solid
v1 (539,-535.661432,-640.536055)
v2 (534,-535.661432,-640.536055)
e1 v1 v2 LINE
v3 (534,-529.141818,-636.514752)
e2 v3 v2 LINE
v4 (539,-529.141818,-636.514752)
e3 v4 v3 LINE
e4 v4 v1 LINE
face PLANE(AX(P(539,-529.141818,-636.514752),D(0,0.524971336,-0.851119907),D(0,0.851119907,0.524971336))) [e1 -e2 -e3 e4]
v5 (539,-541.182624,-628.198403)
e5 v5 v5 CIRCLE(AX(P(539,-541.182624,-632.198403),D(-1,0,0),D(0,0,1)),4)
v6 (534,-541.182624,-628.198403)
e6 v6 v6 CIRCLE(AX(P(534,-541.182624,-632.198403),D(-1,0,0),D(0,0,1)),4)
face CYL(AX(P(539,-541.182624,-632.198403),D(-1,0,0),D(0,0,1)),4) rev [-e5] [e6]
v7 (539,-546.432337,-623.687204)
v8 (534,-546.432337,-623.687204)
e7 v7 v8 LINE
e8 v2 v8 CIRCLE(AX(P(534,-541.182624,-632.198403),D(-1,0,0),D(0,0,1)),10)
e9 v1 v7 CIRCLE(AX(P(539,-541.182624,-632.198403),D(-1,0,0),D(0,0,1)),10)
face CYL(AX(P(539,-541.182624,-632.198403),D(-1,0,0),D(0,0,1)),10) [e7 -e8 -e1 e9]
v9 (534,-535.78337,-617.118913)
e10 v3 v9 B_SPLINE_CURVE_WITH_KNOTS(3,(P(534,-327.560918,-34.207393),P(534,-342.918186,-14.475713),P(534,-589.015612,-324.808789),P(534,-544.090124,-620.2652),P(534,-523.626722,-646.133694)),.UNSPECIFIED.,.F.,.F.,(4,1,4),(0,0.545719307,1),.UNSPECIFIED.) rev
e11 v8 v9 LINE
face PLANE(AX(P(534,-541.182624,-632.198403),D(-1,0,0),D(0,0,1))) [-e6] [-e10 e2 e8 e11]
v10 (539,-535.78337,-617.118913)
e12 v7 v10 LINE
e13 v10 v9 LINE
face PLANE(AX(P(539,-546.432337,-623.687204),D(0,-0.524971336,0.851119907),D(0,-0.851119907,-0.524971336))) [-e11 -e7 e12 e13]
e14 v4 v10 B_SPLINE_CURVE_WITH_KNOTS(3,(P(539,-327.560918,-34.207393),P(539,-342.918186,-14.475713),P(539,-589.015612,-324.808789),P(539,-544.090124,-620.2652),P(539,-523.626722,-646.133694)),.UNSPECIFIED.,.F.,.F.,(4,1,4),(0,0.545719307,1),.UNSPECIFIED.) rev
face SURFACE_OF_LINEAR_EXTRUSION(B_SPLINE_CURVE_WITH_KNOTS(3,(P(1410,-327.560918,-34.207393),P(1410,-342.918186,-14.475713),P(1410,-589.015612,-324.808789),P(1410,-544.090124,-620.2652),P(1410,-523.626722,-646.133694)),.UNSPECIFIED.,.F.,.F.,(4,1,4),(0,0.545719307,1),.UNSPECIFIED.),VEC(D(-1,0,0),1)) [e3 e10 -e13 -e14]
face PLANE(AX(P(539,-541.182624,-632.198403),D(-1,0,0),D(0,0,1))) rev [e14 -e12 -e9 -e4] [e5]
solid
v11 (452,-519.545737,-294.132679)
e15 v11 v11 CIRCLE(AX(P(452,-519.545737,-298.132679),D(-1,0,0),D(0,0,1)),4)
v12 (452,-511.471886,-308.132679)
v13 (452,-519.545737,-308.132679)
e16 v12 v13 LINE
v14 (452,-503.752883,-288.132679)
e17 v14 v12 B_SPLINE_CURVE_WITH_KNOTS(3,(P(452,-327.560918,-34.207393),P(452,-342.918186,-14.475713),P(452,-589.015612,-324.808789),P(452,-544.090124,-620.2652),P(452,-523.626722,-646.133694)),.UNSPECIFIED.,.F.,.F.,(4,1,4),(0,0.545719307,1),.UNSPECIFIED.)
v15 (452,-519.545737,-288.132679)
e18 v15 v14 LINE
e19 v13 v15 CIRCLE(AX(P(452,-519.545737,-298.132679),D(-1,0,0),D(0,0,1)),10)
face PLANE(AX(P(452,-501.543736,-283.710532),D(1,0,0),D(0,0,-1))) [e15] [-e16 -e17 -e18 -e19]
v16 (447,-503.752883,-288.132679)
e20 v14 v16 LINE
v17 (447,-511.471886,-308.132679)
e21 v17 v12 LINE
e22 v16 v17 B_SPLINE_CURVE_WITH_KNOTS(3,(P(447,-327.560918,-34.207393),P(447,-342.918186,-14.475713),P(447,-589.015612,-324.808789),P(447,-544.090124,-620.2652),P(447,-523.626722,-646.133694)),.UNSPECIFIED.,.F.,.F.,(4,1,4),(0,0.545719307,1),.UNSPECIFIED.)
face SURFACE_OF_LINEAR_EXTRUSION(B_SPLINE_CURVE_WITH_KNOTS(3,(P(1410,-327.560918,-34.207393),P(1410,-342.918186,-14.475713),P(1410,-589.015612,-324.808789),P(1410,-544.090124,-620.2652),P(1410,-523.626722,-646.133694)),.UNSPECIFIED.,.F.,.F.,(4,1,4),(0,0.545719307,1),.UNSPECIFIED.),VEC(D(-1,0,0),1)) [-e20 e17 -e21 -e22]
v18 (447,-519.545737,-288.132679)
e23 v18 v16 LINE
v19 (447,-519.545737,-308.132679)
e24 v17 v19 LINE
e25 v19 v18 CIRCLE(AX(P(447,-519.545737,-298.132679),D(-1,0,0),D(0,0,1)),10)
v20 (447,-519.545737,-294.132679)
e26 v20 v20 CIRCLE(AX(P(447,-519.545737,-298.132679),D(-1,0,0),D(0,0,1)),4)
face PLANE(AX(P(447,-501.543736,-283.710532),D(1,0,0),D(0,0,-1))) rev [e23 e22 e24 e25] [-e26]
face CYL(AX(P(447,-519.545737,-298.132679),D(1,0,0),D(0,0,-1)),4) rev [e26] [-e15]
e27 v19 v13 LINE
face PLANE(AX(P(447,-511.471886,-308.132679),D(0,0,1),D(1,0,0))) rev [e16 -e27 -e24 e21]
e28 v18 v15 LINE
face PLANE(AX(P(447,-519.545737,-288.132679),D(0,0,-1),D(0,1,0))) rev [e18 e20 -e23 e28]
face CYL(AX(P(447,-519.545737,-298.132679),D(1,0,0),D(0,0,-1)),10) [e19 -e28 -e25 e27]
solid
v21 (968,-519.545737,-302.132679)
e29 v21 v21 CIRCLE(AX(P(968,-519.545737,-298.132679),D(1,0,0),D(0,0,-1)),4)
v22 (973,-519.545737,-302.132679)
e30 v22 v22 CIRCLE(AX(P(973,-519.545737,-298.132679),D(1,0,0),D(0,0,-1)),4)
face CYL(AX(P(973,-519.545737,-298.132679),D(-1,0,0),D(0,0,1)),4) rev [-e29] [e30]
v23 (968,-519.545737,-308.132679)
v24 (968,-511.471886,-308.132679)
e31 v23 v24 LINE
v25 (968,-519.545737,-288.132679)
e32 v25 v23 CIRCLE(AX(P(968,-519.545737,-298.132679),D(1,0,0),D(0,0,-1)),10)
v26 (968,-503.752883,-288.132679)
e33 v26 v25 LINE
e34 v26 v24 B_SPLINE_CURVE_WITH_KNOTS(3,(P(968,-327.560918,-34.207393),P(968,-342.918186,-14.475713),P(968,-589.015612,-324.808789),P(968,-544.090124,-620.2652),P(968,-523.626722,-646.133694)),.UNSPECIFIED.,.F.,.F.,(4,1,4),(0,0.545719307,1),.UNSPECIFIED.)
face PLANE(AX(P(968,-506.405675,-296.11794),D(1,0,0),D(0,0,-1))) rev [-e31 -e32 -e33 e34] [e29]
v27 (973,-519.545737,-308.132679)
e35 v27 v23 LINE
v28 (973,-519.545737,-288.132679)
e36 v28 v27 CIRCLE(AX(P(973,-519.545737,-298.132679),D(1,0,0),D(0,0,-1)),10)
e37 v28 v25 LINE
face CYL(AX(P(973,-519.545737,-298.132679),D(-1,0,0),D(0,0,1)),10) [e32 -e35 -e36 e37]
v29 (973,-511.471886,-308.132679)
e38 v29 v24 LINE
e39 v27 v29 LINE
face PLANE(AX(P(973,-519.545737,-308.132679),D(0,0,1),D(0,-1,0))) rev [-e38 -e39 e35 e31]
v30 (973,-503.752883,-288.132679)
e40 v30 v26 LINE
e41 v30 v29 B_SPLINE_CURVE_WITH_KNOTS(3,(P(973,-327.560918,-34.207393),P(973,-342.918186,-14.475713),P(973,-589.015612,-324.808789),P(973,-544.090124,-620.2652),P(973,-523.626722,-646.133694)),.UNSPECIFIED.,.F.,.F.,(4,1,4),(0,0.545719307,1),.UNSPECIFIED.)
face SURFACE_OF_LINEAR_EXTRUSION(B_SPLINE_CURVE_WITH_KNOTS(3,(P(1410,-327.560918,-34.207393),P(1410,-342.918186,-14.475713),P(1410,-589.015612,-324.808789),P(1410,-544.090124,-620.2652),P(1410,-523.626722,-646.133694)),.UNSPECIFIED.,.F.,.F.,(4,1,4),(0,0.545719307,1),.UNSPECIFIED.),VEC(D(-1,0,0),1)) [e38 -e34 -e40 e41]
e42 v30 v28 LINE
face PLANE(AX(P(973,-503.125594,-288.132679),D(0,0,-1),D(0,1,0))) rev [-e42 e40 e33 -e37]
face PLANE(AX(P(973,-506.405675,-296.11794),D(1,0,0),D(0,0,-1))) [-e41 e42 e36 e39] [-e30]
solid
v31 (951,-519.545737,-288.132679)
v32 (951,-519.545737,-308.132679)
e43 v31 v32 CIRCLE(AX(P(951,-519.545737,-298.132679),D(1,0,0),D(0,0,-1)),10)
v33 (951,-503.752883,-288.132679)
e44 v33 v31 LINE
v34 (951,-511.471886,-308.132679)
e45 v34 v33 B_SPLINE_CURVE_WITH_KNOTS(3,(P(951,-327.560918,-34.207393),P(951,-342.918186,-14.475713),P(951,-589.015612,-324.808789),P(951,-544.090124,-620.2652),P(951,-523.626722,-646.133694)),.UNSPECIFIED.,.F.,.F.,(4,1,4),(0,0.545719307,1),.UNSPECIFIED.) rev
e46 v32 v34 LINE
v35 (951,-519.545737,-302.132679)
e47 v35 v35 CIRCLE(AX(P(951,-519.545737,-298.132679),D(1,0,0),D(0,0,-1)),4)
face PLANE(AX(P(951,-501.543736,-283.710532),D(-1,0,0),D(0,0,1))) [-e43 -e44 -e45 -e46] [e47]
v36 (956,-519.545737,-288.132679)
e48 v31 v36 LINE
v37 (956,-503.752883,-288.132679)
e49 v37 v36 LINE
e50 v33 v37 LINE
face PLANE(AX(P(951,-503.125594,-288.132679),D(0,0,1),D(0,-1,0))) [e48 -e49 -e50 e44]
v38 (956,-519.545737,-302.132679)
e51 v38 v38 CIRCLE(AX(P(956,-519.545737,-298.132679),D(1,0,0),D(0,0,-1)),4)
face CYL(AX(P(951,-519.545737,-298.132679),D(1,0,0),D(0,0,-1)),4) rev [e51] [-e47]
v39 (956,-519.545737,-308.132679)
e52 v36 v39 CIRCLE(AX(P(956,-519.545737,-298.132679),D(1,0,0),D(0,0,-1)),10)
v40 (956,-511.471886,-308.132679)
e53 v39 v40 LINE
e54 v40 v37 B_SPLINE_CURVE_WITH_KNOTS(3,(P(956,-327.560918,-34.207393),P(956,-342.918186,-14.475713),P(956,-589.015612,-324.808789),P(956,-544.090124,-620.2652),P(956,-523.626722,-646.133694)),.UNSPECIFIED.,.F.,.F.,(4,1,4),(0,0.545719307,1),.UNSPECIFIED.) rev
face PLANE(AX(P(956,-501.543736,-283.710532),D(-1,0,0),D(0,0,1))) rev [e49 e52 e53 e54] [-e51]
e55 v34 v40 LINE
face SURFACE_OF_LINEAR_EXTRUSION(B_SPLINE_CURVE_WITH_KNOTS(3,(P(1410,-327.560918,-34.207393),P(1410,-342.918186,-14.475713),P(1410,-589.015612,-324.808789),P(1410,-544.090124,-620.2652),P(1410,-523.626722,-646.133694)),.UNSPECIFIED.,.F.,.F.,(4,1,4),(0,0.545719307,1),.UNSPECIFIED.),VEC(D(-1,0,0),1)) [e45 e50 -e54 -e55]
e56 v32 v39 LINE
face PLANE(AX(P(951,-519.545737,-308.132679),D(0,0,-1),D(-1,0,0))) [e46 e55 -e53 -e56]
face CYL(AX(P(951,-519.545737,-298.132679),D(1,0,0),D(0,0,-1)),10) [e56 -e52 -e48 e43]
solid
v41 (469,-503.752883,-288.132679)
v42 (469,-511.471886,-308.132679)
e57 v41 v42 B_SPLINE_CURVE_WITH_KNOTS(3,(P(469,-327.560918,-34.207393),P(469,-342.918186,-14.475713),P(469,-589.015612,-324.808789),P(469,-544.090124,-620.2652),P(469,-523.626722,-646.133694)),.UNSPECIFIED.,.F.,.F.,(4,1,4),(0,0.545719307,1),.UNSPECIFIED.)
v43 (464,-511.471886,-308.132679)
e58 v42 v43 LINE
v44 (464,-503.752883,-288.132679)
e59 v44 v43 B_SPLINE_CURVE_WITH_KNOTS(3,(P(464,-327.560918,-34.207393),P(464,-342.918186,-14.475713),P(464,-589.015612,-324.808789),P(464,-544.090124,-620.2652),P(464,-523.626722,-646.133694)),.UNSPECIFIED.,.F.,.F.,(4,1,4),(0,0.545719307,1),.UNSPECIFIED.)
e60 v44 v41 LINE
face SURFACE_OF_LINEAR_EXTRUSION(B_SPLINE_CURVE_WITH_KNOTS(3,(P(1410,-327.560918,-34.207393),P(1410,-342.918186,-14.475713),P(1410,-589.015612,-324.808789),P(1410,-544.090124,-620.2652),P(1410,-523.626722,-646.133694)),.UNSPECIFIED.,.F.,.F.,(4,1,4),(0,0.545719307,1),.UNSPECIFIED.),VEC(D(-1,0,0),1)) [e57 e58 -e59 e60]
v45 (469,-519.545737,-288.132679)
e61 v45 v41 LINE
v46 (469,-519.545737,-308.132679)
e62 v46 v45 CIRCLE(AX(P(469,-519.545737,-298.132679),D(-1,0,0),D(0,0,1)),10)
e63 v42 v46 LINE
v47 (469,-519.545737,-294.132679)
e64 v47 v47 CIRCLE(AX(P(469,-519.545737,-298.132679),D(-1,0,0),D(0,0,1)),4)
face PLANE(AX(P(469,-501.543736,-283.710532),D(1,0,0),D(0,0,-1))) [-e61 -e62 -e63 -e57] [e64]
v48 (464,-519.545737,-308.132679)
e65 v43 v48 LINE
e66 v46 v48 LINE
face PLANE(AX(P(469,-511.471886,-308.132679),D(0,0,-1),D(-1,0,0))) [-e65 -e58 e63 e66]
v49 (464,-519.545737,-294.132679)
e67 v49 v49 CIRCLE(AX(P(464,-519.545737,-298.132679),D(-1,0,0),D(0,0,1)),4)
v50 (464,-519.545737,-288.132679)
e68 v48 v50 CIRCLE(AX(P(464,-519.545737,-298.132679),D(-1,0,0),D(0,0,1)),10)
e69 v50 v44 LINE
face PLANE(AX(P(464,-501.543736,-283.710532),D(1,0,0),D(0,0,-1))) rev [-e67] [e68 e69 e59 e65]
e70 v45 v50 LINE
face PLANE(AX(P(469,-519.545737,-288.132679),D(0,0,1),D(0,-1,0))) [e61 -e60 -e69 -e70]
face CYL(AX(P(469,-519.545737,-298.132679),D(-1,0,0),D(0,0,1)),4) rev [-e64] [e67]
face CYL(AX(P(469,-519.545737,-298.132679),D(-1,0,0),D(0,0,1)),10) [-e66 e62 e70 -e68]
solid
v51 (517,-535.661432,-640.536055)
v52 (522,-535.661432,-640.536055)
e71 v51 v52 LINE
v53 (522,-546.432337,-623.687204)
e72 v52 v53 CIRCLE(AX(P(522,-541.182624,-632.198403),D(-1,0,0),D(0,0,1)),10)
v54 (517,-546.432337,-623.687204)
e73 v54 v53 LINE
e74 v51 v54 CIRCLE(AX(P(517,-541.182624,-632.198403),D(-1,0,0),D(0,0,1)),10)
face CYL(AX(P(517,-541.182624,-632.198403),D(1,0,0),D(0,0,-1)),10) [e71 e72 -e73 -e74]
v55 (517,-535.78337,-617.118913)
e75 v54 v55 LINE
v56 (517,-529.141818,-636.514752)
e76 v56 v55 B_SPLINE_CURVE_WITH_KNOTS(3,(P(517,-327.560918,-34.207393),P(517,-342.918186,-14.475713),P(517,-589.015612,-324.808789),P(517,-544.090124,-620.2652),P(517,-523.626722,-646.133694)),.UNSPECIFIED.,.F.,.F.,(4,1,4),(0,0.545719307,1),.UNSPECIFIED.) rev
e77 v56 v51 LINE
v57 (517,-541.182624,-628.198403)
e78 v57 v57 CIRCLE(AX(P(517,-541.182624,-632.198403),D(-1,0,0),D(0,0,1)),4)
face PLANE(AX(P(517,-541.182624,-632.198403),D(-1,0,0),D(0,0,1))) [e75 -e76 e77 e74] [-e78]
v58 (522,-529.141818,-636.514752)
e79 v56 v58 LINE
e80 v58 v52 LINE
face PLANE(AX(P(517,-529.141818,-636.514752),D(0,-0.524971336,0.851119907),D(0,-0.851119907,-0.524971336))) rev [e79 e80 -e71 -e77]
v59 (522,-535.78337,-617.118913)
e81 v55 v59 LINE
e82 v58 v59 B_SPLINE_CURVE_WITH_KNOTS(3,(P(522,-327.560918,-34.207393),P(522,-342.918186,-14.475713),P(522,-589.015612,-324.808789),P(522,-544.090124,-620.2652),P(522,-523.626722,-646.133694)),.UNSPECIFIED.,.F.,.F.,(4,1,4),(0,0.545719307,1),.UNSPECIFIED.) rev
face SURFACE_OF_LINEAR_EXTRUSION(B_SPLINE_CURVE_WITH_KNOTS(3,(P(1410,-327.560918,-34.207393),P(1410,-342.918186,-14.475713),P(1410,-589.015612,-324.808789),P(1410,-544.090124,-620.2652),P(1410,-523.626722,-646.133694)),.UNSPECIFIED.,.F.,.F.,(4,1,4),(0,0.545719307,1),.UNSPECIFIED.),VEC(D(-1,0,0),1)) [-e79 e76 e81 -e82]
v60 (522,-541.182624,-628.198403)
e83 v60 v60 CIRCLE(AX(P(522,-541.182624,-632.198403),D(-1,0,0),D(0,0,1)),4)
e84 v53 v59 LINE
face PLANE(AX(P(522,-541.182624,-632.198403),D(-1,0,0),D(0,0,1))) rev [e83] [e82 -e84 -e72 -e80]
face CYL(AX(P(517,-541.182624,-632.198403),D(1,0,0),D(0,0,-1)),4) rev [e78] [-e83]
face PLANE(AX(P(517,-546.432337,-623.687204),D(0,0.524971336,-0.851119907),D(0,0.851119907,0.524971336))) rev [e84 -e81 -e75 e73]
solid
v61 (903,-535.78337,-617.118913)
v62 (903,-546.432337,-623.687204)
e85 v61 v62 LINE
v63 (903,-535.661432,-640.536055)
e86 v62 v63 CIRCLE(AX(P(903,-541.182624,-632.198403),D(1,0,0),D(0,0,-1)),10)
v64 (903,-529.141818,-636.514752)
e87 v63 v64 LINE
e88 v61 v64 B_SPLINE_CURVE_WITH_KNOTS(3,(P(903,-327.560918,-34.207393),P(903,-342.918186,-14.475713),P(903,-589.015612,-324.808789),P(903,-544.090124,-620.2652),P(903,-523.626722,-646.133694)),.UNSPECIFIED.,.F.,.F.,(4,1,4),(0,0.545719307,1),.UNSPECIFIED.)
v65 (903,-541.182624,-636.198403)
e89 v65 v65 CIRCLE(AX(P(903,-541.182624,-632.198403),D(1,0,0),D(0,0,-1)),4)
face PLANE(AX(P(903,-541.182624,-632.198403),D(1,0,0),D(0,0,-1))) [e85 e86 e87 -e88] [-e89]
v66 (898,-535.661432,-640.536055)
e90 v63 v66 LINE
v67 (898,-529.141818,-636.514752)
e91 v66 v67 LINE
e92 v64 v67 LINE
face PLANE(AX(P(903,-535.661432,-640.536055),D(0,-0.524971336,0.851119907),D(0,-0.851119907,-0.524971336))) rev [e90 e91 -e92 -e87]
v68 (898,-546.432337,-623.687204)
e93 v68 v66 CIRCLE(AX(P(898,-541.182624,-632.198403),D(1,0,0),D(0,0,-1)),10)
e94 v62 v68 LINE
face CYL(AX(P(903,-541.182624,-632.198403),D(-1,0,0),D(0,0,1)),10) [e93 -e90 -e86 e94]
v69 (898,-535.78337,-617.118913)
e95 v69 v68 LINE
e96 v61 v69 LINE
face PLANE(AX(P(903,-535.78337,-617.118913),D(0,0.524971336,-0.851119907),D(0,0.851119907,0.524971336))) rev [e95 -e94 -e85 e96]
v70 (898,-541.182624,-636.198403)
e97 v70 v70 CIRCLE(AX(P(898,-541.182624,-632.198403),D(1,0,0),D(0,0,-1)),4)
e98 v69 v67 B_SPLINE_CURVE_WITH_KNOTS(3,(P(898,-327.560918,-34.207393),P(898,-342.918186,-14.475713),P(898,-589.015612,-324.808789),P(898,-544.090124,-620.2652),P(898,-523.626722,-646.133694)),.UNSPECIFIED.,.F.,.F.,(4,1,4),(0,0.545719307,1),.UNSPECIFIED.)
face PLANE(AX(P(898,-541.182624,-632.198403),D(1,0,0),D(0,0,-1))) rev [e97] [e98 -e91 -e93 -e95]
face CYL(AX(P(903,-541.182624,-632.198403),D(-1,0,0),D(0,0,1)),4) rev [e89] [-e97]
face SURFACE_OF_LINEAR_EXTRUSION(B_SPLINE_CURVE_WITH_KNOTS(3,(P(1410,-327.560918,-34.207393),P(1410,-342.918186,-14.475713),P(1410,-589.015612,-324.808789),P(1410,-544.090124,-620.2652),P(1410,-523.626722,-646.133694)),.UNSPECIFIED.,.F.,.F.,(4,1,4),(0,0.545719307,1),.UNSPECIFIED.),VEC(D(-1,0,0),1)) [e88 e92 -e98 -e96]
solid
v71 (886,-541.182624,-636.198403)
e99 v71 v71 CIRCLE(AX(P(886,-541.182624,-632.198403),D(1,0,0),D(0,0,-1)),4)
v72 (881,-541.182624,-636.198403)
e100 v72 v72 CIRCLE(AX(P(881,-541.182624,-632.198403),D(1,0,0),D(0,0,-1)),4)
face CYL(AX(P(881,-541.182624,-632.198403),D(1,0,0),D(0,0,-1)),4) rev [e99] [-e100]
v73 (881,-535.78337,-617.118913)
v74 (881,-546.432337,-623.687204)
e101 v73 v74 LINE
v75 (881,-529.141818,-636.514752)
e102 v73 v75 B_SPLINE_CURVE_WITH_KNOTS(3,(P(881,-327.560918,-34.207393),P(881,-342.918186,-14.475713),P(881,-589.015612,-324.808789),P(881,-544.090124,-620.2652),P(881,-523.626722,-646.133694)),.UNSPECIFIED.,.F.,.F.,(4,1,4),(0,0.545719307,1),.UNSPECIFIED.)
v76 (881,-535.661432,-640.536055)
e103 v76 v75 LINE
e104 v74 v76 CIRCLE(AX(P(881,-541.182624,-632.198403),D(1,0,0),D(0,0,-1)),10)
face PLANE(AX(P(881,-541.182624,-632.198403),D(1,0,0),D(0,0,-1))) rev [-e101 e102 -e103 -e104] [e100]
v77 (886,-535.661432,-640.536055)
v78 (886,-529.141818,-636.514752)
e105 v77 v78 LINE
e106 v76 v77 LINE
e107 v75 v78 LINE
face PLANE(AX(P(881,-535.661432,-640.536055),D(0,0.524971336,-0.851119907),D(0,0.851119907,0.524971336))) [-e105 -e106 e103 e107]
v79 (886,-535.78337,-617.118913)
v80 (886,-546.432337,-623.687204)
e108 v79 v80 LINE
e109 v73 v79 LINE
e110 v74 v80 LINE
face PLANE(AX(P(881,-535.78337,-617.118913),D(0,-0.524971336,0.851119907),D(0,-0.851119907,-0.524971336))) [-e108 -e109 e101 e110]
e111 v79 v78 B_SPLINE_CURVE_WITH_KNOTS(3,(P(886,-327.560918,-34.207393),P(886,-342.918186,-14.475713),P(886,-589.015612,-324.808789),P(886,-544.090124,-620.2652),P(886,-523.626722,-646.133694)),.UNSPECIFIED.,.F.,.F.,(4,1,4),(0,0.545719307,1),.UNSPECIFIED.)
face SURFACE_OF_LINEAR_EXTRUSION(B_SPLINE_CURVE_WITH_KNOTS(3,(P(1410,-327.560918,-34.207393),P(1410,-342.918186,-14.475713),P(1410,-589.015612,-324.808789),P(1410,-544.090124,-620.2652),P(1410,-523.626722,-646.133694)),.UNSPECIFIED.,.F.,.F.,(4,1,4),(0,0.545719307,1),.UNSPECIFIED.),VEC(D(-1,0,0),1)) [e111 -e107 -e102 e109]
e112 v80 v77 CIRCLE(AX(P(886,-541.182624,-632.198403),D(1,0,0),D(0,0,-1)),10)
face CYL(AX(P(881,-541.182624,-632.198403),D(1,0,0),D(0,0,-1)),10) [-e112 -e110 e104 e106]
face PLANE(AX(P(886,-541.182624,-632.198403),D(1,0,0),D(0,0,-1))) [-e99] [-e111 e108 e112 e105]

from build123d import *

# Parameters (mm, degrees)
BOSS_EXTRUDE1_DEPTH  = 10
BOSS_EXTRUDE2_DEPTH  = 1400
SPLIT2_DEPTH         = 10
SKETCH4_R            = 4
BOSS_EXTRUDE3_DEPTH  = 5
BOSS_EXTRUDE4_START  = -5
SKETCH5_R            = 4
BOSS_EXTRUDE4_DEPTH  = 5
BOSS_EXTRUDE5_START  = 5
SKETCH6_R            = 4
BOSS_EXTRUDE5_DEPTH  = 5
SKETCH7_R            = 4
BOSS_EXTRUDE6_DEPTH  = 5
SKETCH8_R            = 4
BOSS_EXTRUDE7_DEPTH  = 5
BOSS_EXTRUDE8_START  = -5
SKETCH9_R            = 4
BOSS_EXTRUDE8_DEPTH  = 5
SKETCH10_R           = 4
BOSS_EXTRUDE9_DEPTH  = 5
BOSS_EXTRUDE10_START = 5
SKETCH11_R           = 4
BOSS_EXTRUDE10_DEPTH = 5
SPLIT3_START         = 10
SPLIT3_DEPTH         = 1400


# Read off the part's stored shape, not the designer's step: Split2, Split3
with BuildPart() as part:
    # Sketch1 → Boss-Extrude1 (new body)
    with BuildSketch(Plane(origin=(0, 0, 0), x_dir=(0, 0, -1), z_dir=(1, 0, 0))):
        with BuildLine():
            Line((0, -39.159060238), (0, -399.159060238))
            ThreePointArc((0, -399.159060238), (2.810766389, -411.83760809), (10.716371709, -422.140393531))
            Line((10.716371709, -422.140393531), (202.227482489, -582.837295953))
            ThreePointArc((202.227482489, -582.837295953), (211.25050648, -588.046741283), (221.51111078, -589.855962659))
            Line((221.51111078, -589.855962659), (671.51111078, -589.855962659))
            ThreePointArc((671.51111078, -589.855962659), (692.724314215, -581.069166095), (701.51111078, -559.855962659))
            Line((701.51111078, -559.855962659), (701.51111078, -369.855962659))
            ThreePointArc((701.51111078, -369.855962659), (700.081380744, -360.705024227), (695.928465834, -352.426310564))
            Line((695.928465834, -352.426310564), (556.491249073, -157.087470131))
            ThreePointArc((556.491249073, -157.087470131), (549.188422732, -149.877866821), (539.883012979, -145.551320648))
            Line((539.883012979, -145.551320648), (37.809118961, -10.19325866))
            ThreePointArc((37.809118961, -10.19325866), (11.755460664, -15.344426409), (0, -39.159060238))
        make_face()
    extrude(amount=BOSS_EXTRUDE1_DEPTH)

    # Sketch2 → Boss-Extrude2 (add)
    with BuildSketch(Plane(origin=(10, 0, 0), x_dir=(0, 0, -1), z_dir=(1, 0, 0))):
        with BuildLine():
            ThreePointArc((626.364411935, -475.947865394), (654.270375926, -492.315038086), (646.133694128, -523.626722446))
            add(Edge.make_bspline(
                [(646.133694128, -523.626722446), (620.265200397, -544.090123727), (324.808789115, -589.015611509), (14.475713482, -342.918185901), (34.207392898, -327.560917886)],
                knots=[0, 0, 0, 0, 0.454280693, 1, 1, 1, 1], degree=3))
            ThreePointArc((34.207392898, -327.560917886), (38.301805286, -326.1553415), (42.396217675, -327.560917886))
            add(Edge.make_bspline(
                [(42.396217675, -327.560917886), (179.998241324, -434.657283692), (369.496171973, -510.067463814), (572.427382245, -482.279425386), (626.364411935, -475.947865394)],
                knots=[0, 0, 0, 0, 0.742688993, 1, 1, 1, 1], degree=3))
        make_face()
        with BuildLine():
            ThreePointArc((66.698936736, -215.359019498), (67.092959072, -208.260098077), (74.202765192, -208.284508838))
            add(Edge.make_bspline(
                [(74.202765192, -208.284508838), (81.149231878, -214.924232147), (316.076431581, -369.790908175), (526.742508558, -357.109499901), (567.085033992, -348.175125638)],
                knots=[0, 0, 0, 0, 0.768435057, 1, 1, 1, 1], degree=3))
            ThreePointArc((567.085033992, -348.175125638), (594.800287265, -365.58541059), (577.755509271, -393.526935767))
            add(Edge.make_bspline(
                [(66.698936736, -215.359019498), (100.320017518, -254.957400328), (300.322217315, -390.035120939), (509.639726303, -410.500517765), (577.755509271, -393.526935767)],
                knots=[0, 0, 0, 0, 0.654710405, 1, 1, 1, 1], degree=3))
        make_face()
        with BuildLine():
            ThreePointArc((92.163413905, -98.198220596), (93.433821546, -92.827514339), (98.829146805, -93.988930122))
            add(Edge.make_bspline(
                [(98.829146805, -93.988930122), (112.622758483, -114.88285895), (192.730208888, -182.13783781), (300.184384568, -194.688304583), (331.179728441, -194.685467652)],
                knots=[0, 0, 0, 0, 0.660882752, 1, 1, 1, 1], degree=3))
            ThreePointArc((331.179728441, -194.685467652), (341.545058852, -204.318697463), (332.693478174, -215.359019498))
            add(Edge.make_bspline(
                [(92.163413905, -98.198220596), (126.325036043, -154.802617957), (226.918714052, -224.562098265), (331.921739283, -215.472572374), (332.693478174, -215.359019498)],
                knots=[0, 0, 0, 0, 0.645739259, 1, 1, 1, 1], degree=3))
        make_face()
    extrude(amount=BOSS_EXTRUDE2_DEPTH)

    # Split2 outline → Split2 (cut)
    with BuildSketch(Plane.YZ):
        with BuildLine():
            ThreePointArc((-157.087470131, -556.491249073), (-149.877866821, -549.188422732), (-145.551320648, -539.883012979))
            Line((-145.551320648, -539.883012979), (-10.19325866, -37.809118961))
            ThreePointArc((-10.19325866, -37.809118961), (-15.344426409, -11.755460664), (-39.159060238, 0))
            Line((-39.159060238, 0), (-399.159060238, 0))
            ThreePointArc((-399.159060238, 0), (-411.83760809, -2.810766389), (-422.140393531, -10.716371709))
            Line((-422.140393531, -10.716371709), (-582.837295953, -202.227482489))
            ThreePointArc((-582.837295953, -202.227482489), (-588.046741283, -211.25050648), (-589.855962659, -221.51111078))
            Line((-589.855962659, -221.51111078), (-589.855962659, -671.51111078))
            ThreePointArc((-589.855962659, -671.51111078), (-581.069166095, -692.724314215), (-559.855962659, -701.51111078))
            Line((-559.855962659, -701.51111078), (-369.855962659, -701.51111078))
            ThreePointArc((-369.855962659, -701.51111078), (-360.705024227, -700.081380744), (-352.426310564, -695.928465834))
            Line((-352.426310564, -695.928465834), (-157.087470131, -556.491249073))
        make_face()
    extrude(amount=SPLIT2_DEPTH, mode=Mode.SUBTRACT)

    # Sketch4 → Boss-Extrude3 (add)
    with BuildSketch(Plane(origin=(968, 0, 0), x_dir=(0, 0, -1), z_dir=(1, 0, 0))):
        with BuildLine():
            Line((288.132678683, -503.125593865), (288.132678683, -519.545737388))
            ThreePointArc((288.132678683, -519.545737388), (298.132678683, -529.545737388), (308.132678683, -519.545737388))
            Line((308.132678683, -519.545737388), (308.132678683, -511.471886152))
            add(Edge.make_bspline(
                [(288.132678683, -503.125593865), (294.10320056, -505.512610704), (308.132678683, -511.471886152)],
                knots=[0, 0, 0, 1, 1, 1], degree=2))
        make_face()
        with Locations((298.132678683, -519.545737388)):
            Circle(SKETCH4_R, mode=Mode.SUBTRACT)
    extrude(amount=BOSS_EXTRUDE3_DEPTH)

    # Sketch5 → Boss-Extrude4 (add)
    with BuildSketch(Plane(origin=(956, 0, 0), x_dir=(0, 0, -1), z_dir=(1, 0, 0)).offset(BOSS_EXTRUDE4_START)):
        with BuildLine():
            Line((288.132678683, -503.125593865), (288.132678683, -519.545737388))
            ThreePointArc((288.132678683, -519.545737388), (298.132678683, -529.545737388), (308.132678683, -519.545737388))
            Line((308.132678683, -519.545737388), (308.132678683, -511.471886152))
            add(Edge.make_bspline(
                [(308.132678683, -511.471886152), (294.103200562, -505.512610705), (288.132678683, -503.125593865)],
                knots=[0, 0, 0, 1, 1, 1], degree=2))
        make_face()
        with Locations((298.132678683, -519.545737388)):
            Circle(SKETCH5_R, mode=Mode.SUBTRACT)
    extrude(amount=BOSS_EXTRUDE4_DEPTH)

    # Sketch6 → Boss-Extrude5 (add)
    with BuildSketch(Plane.ZY.offset(-452).offset(BOSS_EXTRUDE5_START)):
        with BuildLine():
            Line((-288.132678683, -519.545737388), (-288.132678683, -503.125593865))
            add(Edge.make_bspline(
                [(-288.132678683, -503.125593865), (-294.103200562, -505.512610705), (-308.132678683, -511.471886152)],
                knots=[0, 0, 0, 1, 1, 1], degree=2))
            Line((-308.132678683, -511.471886152), (-308.132678683, -519.545737388))
            ThreePointArc((-308.132678683, -519.545737388), (-298.132678683, -529.545737388), (-288.132678683, -519.545737388))
        make_face()
        with Locations(Location((-298.132678683, -519.545737388, 0), (0, 0, 180))):
            Circle(SKETCH6_R, mode=Mode.SUBTRACT)
    extrude(amount=-BOSS_EXTRUDE5_DEPTH)

    # Sketch7 → Boss-Extrude6 (add)
    with BuildSketch(Plane.ZY.offset(-464)):
        with BuildLine():
            Line((-288.132678683, -519.545737388), (-288.132678683, -503.125593865))
            add(Edge.make_bspline(
                [(-288.132678683, -503.125593865), (-294.103200562, -505.512610705), (-308.132678683, -511.471886152)],
                knots=[0, 0, 0, 1, 1, 1], degree=2))
            Line((-308.132678683, -511.471886152), (-308.132678683, -519.545737388))
            ThreePointArc((-308.132678683, -519.545737388), (-298.132678683, -529.545737388), (-288.132678683, -519.545737388))
        make_face()
        with Locations(Location((-298.132678683, -519.545737388, 0), (0, 0, 180))):
            Circle(SKETCH7_R, mode=Mode.SUBTRACT)
    extrude(amount=-BOSS_EXTRUDE6_DEPTH)

    # Sketch8 → Boss-Extrude7 (add)
    with BuildSketch(Plane(origin=(898, 0, 0), x_dir=(0, 0, -1), z_dir=(1, 0, 0))):
        with BuildLine():
            Line((617.1189132, -535.783369671), (623.687203666, -546.432337306))
            ThreePointArc((623.687203666, -546.432337306), (637.584554422, -549.608142918), (640.536054647, -535.661431988))
            Line((640.536054647, -535.661431988), (636.514752084, -529.141817628))
            Line((636.514752084, -529.141817628), (617.1189132, -535.783369671))
        make_face()
        with Locations((632.198402735, -541.182623942)):
            Circle(SKETCH8_R, mode=Mode.SUBTRACT)
    extrude(amount=BOSS_EXTRUDE7_DEPTH)

    # Sketch9 → Boss-Extrude8 (add)
    with BuildSketch(Plane(origin=(886, 0, 0), x_dir=(0, 0, -1), z_dir=(1, 0, 0)).offset(BOSS_EXTRUDE8_START)):
        with BuildLine():
            Line((617.1189132, -535.783369671), (623.687203666, -546.432337306))
            ThreePointArc((623.687203666, -546.432337306), (637.584554422, -549.608142918), (640.536054647, -535.661431988))
            Line((640.536054647, -535.661431988), (636.514752084, -529.141817628))
            Line((636.514752084, -529.141817628), (617.1189132, -535.783369671))
        make_face()
        with Locations((632.198402735, -541.182623942)):
            Circle(SKETCH9_R, mode=Mode.SUBTRACT)
    extrude(amount=BOSS_EXTRUDE8_DEPTH)

    # Sketch10 → Boss-Extrude9 (add)
    with BuildSketch(Plane.ZY.offset(-534)):
        with BuildLine():
            Line((-623.687203666, -546.432337306), (-617.1189132, -535.783369671))
            Line((-617.1189132, -535.783369671), (-636.514752084, -529.141817628))
            Line((-636.514752084, -529.141817628), (-640.536054647, -535.661431988))
            ThreePointArc((-640.536054647, -535.661431988), (-637.584554422, -549.608142918), (-623.687203666, -546.432337306))
        make_face()
        with Locations(Location((-632.198402735, -541.182623942, 0), (0, 0, 180))):
            Circle(SKETCH10_R, mode=Mode.SUBTRACT)
    extrude(amount=-BOSS_EXTRUDE9_DEPTH)

    # Sketch11 → Boss-Extrude10 (add)
    with BuildSketch(Plane.ZY.offset(-522).offset(BOSS_EXTRUDE10_START)):
        with BuildLine():
            Line((-623.687203666, -546.432337306), (-617.1189132, -535.783369671))
            Line((-617.1189132, -535.783369671), (-636.514752084, -529.141817628))
            Line((-636.514752084, -529.141817628), (-640.536054647, -535.661431988))
            ThreePointArc((-640.536054647, -535.661431988), (-637.584554422, -549.608142918), (-623.687203666, -546.432337306))
        make_face()
        with Locations(Location((-632.198402735, -541.182623942, 0), (0, 0, 180))):
            Circle(SKETCH11_R, mode=Mode.SUBTRACT)
    extrude(amount=-BOSS_EXTRUDE10_DEPTH)

    # Split3 outline → Split3 (cut)
    with BuildSketch(Plane.YZ.offset(SPLIT3_START)):
        with BuildLine():
            add(Edge.make_bspline(
                [(-511.471886152, -308.132678683), (-516.43969624, -321.631784584), (-557.088541152, -444.350129763), (-549.96236653, -564.626286038), (-535.783369672, -617.1189132)],
                knots=[0.500894987, 0.500894987, 0.500894987, 0.500894987, 0.545719307, 0.906064579, 0.906064579, 0.906064579, 0.906064579], degree=3))
            add(Edge.make_bspline(
                [(-535.783369672, -617.1189132), (-533.706392576, -624.808172558), (-531.461165575, -631.328504266), (-529.14181754, -636.51475228)],
                knots=[0.906064579, 0.906064579, 0.906064579, 0.906064579, 0.958848911, 0.958848911, 0.958848911, 0.958848911], degree=3))
            add(Edge.make_bspline(
                [(-529.14181754, -636.51475228), (-527.333635229, -640.557992803), (-525.480402933, -643.790392475), (-523.626722446, -646.133694128)],
                knots=[0.958848911, 0.958848911, 0.958848911, 0.958848911, 1, 1, 1, 1], degree=3))
            ThreePointArc((-523.626722446, -646.133694128), (-492.315038086, -654.270375926), (-475.947865394, -626.364411935))
            add(Edge.make_bspline(
                [(-475.947865394, -626.364411935), (-482.279425386, -572.427382245), (-510.067463814, -369.496171973), (-434.657283692, -179.998241324), (-327.560917886, -42.396217675)],
                knots=[0, 0, 0, 0, 0.257311007, 1, 1, 1, 1], degree=3))
            ThreePointArc((-327.560917886, -42.396217675), (-326.1553415, -38.301805286), (-327.560917886, -34.207392898))
            add(Edge.make_bspline(
                [(-327.560917886, -34.207392898), (-341.031625272, -16.899647836), (-446.017106891, -145.075235312), (-503.752882851, -288.132678683)],
                knots=[0, 0, 0, 0, 0.478680524, 0.478680524, 0.478680524, 0.478680524], degree=3))
            add(Edge.make_bspline(
                [(-503.752882851, -288.132678683), (-506.432267483, -294.771645752), (-509.009891619, -301.442663498), (-511.471886152, -308.132678683)],
                knots=[0.478680524, 0.478680524, 0.478680524, 0.478680524, 0.500894987, 0.500894987, 0.500894987, 0.500894987], degree=3))
        make_face()
        with BuildLine():
            ThreePointArc((-93.988930122, -98.829146805), (-92.827514339, -93.433821546), (-98.198220596, -92.163413905))
            add(Edge.make_bspline(
                [(-98.198220596, -92.163413905), (-154.802617957, -126.325036043), (-224.562098265, -226.918714052), (-215.472572374, -331.921739283), (-215.359019498, -332.693478174)],
                knots=[0, 0, 0, 0, 0.645739259, 1, 1, 1, 1], degree=3))
            ThreePointArc((-215.359019498, -332.693478174), (-204.318697463, -341.545058852), (-194.685467652, -331.179728441))
            add(Edge.make_bspline(
                [(-194.685467652, -331.179728441), (-194.688304583, -300.184384568), (-182.13783781, -192.730208888), (-114.88285895, -112.622758483), (-93.988930122, -98.829146805)],
                knots=[0, 0, 0, 0, 0.339117248, 1, 1, 1, 1], degree=3))
        make_face()
        with BuildLine():
            ThreePointArc((-208.284508838, -74.202765192), (-208.260098077, -67.092959072), (-215.359019498, -66.698936736))
            add(Edge.make_bspline(
                [(-215.359019498, -66.698936736), (-254.957400328, -100.320017518), (-390.035120939, -300.322217315), (-410.500517765, -509.639726303), (-393.526935767, -577.755509271)],
                knots=[0, 0, 0, 0, 0.654710405, 1, 1, 1, 1], degree=3))
            ThreePointArc((-393.526935767, -577.755509271), (-365.58541059, -594.800287265), (-348.175125638, -567.085033992))
            add(Edge.make_bspline(
                [(-348.175125638, -567.085033992), (-357.109499901, -526.742508558), (-369.790908175, -316.076431581), (-214.924232147, -81.149231878), (-208.284508838, -74.202765192)],
                knots=[0, 0, 0, 0, 0.231564943, 1, 1, 1, 1], degree=3))
        make_face()
    extrude(amount=SPLIT3_DEPTH, mode=Mode.SUBTRACT)


solid = part.part
